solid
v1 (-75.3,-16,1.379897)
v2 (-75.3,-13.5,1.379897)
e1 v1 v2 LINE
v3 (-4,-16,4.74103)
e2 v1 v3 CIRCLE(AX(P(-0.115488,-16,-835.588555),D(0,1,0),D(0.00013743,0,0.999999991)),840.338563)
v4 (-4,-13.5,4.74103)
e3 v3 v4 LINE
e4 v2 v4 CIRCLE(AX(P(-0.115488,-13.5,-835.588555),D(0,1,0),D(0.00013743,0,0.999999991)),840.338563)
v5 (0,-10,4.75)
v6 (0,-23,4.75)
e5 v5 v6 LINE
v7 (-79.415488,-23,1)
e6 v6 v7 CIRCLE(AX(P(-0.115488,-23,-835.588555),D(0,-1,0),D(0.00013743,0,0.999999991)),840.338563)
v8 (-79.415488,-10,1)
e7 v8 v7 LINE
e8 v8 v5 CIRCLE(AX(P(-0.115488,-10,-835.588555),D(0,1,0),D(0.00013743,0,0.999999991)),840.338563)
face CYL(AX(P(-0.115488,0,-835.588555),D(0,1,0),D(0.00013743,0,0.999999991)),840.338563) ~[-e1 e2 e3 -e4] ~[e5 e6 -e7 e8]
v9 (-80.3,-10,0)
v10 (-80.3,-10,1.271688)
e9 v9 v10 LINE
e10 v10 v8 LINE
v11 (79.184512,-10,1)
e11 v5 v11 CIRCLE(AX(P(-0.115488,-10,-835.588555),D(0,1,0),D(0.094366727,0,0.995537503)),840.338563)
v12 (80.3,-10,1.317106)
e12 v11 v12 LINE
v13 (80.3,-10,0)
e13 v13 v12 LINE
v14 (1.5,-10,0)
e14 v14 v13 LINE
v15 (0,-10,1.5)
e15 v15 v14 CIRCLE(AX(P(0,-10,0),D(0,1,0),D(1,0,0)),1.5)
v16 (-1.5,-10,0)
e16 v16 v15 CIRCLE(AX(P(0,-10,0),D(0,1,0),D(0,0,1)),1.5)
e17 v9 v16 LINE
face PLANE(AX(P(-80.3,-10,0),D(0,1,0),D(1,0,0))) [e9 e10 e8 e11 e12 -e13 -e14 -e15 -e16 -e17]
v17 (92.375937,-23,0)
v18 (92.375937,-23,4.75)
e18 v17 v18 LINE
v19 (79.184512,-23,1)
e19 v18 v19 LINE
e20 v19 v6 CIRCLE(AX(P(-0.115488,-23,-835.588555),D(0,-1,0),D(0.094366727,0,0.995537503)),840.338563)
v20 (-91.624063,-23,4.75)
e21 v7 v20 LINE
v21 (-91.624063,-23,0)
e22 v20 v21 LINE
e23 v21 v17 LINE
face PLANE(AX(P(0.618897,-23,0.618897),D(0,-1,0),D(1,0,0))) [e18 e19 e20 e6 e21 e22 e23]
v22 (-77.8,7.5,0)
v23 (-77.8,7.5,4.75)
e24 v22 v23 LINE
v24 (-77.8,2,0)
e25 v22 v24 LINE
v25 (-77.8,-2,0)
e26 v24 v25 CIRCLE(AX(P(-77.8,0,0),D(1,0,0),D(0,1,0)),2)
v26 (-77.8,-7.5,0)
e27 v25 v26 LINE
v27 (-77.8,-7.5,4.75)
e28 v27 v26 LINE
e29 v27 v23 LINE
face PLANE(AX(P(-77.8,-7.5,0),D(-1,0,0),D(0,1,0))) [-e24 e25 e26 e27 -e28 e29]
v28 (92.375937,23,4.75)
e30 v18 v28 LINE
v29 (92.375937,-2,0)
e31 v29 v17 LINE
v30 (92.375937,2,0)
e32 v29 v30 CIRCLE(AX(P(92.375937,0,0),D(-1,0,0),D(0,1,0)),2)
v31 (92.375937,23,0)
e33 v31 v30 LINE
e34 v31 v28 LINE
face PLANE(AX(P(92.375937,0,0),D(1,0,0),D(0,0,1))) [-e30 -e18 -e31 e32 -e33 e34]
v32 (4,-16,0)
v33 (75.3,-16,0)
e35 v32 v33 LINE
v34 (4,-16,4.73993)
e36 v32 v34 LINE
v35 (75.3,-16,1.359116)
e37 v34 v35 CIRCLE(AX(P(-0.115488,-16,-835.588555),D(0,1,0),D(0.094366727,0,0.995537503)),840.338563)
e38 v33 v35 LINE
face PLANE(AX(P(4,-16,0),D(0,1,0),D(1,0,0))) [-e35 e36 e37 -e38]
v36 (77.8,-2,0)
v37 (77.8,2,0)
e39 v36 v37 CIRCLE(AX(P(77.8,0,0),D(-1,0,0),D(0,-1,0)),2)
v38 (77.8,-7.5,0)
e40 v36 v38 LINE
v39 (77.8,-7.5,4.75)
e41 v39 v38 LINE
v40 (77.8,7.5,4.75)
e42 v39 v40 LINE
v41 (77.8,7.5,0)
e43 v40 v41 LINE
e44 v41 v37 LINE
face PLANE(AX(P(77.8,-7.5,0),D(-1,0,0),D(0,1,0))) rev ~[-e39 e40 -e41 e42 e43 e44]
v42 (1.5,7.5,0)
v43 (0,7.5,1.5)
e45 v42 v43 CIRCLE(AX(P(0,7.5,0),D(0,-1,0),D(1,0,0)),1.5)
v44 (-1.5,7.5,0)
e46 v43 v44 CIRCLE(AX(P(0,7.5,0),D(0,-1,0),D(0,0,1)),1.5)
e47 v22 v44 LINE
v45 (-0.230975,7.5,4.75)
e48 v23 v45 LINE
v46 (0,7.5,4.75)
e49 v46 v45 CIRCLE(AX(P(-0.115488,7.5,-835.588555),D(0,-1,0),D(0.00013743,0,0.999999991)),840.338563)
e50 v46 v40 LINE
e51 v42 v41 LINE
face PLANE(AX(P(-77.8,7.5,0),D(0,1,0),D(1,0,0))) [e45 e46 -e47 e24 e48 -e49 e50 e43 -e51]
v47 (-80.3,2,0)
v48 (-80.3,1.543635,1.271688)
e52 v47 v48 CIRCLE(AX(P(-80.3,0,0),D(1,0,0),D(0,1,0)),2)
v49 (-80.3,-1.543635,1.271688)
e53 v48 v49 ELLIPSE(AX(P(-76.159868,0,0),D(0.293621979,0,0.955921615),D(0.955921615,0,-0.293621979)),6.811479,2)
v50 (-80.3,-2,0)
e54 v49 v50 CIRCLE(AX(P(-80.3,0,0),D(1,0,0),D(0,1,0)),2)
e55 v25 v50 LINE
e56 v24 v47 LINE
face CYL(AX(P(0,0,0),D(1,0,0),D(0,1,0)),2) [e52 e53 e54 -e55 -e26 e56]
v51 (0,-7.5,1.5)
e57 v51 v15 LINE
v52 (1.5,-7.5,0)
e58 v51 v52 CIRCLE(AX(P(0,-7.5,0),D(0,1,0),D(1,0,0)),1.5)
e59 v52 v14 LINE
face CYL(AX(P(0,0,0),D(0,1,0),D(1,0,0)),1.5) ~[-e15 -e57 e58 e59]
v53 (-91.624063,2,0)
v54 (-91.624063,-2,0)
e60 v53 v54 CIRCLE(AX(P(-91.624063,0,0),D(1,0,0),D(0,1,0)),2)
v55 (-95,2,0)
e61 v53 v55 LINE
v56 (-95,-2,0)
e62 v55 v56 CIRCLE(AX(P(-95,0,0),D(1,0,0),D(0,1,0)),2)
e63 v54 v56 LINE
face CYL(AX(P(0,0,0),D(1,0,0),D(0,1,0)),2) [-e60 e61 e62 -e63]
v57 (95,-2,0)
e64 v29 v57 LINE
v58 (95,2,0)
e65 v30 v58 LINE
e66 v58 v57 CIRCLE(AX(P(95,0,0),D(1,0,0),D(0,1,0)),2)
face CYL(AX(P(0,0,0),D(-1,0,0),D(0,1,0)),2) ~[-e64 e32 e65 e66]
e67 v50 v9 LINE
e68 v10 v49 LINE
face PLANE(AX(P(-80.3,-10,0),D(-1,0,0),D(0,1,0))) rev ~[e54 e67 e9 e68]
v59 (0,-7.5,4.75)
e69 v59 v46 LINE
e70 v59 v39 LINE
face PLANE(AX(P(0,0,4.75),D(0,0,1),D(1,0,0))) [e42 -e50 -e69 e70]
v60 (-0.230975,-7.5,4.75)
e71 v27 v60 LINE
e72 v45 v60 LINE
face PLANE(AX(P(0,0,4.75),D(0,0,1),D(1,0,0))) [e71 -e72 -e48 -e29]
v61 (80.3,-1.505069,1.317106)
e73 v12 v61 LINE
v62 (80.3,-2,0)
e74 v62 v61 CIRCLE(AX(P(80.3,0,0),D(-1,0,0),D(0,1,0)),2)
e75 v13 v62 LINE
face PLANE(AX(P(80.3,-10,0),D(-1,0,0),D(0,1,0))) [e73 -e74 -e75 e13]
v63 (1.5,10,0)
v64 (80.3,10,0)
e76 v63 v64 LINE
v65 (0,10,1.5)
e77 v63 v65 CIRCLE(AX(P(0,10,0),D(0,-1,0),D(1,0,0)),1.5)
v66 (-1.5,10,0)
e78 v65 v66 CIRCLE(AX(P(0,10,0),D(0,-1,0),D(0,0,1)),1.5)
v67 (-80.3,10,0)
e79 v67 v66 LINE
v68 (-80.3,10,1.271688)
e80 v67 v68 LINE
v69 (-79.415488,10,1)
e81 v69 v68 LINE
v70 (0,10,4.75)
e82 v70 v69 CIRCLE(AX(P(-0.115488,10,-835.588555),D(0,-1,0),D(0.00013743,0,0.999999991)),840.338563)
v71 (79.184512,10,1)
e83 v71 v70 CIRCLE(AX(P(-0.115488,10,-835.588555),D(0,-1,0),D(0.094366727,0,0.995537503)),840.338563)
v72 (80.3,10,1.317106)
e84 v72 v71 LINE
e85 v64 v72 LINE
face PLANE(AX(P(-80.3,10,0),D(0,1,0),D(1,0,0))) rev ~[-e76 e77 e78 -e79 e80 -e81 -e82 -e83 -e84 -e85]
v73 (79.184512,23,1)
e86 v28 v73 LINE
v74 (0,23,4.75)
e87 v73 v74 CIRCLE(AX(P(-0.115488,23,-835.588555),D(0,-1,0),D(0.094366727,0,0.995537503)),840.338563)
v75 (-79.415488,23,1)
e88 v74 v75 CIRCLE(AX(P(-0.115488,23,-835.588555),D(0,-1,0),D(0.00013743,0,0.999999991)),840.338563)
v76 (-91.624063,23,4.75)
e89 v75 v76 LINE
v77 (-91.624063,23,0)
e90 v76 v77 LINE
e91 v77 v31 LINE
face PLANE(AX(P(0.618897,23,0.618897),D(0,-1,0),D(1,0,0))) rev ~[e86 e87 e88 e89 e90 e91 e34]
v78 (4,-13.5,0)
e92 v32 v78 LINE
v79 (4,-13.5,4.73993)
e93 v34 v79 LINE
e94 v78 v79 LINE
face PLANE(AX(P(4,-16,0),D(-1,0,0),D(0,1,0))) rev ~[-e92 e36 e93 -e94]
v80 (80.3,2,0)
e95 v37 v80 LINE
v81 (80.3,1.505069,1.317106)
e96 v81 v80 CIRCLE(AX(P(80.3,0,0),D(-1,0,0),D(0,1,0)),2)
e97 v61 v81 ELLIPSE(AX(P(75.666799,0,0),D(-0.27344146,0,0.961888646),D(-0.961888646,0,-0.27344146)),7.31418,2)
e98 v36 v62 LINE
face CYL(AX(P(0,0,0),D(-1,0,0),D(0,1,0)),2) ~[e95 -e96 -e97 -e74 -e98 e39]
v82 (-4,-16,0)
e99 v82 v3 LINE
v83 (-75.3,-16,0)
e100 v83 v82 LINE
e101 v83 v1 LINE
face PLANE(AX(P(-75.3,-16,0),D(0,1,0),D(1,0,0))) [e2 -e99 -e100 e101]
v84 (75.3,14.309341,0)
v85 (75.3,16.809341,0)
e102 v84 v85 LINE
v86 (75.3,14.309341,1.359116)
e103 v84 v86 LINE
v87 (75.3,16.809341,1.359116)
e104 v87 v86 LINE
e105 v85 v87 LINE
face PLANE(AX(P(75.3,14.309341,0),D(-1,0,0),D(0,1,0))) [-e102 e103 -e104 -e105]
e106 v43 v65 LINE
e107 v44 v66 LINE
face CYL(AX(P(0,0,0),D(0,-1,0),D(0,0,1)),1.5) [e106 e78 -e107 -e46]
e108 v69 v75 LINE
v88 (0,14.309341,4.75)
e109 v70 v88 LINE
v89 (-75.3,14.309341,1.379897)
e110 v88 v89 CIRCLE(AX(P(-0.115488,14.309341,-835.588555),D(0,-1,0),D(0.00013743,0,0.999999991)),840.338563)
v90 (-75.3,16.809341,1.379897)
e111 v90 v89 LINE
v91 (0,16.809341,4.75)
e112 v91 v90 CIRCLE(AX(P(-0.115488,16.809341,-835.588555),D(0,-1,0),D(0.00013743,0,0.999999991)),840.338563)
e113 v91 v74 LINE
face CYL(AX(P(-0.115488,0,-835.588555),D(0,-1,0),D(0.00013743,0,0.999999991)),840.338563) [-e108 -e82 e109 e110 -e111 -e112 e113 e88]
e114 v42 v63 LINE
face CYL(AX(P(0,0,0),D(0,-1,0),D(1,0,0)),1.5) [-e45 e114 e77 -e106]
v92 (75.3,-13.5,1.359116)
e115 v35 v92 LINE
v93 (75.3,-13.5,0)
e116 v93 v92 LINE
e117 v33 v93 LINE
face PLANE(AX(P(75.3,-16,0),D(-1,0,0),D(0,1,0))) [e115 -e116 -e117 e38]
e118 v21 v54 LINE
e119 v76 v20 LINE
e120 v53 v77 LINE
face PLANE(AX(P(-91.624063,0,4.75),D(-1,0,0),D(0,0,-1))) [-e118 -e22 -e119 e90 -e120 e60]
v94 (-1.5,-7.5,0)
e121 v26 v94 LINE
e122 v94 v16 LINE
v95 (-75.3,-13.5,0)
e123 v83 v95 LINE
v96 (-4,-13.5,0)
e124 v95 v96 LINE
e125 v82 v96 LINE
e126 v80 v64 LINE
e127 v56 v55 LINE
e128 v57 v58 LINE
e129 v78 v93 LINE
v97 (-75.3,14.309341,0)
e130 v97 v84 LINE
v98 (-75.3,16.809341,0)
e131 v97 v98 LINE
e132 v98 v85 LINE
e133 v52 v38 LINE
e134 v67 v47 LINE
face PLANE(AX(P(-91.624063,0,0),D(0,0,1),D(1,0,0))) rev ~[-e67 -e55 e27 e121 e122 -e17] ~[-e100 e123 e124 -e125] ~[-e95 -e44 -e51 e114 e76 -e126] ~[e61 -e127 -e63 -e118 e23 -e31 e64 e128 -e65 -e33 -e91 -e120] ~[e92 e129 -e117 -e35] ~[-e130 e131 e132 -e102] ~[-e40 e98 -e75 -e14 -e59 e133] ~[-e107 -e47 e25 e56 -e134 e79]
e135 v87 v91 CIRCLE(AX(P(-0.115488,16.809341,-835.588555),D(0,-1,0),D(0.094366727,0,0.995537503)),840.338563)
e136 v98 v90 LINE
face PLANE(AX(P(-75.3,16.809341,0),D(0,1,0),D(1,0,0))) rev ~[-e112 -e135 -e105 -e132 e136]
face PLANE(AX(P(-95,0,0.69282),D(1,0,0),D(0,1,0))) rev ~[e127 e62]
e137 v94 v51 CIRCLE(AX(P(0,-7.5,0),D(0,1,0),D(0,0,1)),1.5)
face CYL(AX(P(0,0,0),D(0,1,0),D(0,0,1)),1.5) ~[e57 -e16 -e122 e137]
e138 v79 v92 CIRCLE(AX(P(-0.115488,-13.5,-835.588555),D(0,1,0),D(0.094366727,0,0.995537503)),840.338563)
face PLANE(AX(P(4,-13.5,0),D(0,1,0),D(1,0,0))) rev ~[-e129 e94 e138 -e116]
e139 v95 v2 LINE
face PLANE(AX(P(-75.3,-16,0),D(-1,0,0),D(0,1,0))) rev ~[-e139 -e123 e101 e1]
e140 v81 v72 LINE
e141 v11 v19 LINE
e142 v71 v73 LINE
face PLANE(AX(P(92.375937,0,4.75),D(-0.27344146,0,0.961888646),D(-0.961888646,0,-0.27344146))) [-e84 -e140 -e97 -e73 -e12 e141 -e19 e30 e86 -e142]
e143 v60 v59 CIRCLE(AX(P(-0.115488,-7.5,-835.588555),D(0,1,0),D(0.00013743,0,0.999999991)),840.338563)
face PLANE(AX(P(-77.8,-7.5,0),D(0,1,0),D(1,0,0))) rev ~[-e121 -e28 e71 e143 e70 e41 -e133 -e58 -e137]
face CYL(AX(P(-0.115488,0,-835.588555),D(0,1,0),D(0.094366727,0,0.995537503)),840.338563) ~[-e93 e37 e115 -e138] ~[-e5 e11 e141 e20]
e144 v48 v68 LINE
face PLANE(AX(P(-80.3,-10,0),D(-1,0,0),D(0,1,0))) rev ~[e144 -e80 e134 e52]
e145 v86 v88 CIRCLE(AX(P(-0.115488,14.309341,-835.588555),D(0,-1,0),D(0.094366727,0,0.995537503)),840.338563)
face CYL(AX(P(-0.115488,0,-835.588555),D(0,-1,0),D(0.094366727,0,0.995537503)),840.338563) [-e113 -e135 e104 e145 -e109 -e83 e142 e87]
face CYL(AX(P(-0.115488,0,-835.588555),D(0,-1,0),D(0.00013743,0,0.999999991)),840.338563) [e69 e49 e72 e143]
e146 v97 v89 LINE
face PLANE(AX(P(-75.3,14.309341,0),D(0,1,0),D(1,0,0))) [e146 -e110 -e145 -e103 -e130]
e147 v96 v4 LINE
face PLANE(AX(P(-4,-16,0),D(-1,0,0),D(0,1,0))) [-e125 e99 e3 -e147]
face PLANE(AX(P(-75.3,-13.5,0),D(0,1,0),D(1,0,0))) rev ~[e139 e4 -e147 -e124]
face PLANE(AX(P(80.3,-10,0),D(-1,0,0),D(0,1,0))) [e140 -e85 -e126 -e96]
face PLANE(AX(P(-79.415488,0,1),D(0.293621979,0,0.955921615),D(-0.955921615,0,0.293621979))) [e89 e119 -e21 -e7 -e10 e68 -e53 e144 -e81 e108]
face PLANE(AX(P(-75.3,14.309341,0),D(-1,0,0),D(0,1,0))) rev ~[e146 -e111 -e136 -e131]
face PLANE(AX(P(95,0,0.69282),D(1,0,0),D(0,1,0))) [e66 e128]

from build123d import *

# Parameters (mm, degrees)
F3_DEPTH      = 23
F3_DEPTH_BACK = 23
F2_W          = 71.3
F2_H          = 2.5
F2_W_2        = 160.6
F2_H_2        = 20
F2_W_3        = 155.6
F2_H_3        = 15
F2_W_4        = 150.6
F4_DEPTH      = 5
F7_DEPTH      = 95
F7_DEPTH_BACK = 95
F8_DEPTH      = 12
F8_DEPTH_BACK = 12
F9_DEPTH      = 4.75


# Not quite as in the source:
# - a feature names something its author has since deleted; it is built from what else it names


with BuildPart() as f3:
    # F0 (on Front) → F3 (new body, two sides)
    with BuildSketch(Plane.XZ) as f3_sk:
        with BuildLine():
            Line((0, 1.5), (0, 0))
            Line((0, 0), (1.5, 0))
            ThreePointArc((1.5, 0), (1.0606601718, 1.0606601718), (0, 1.5))
        make_face()
        with BuildLine():
            ThreePointArc((0, 1.5), (-1.0606601718, 1.0606601718), (-1.5, 0))
            Line((-1.5, 0), (0, 0))
            Line((0, 0), (0, 1.5))
        make_face()
        with BuildLine():
            Line((-91.6240630262, 0), (-79.4154876804, 0))
            Line((-79.4154876804, 0), (-1.5, 0))
            ThreePointArc((-1.5, 0), (-1.0606601718, 1.0606601718), (0, 1.5))
            Line((0, 1.5), (0, 4.75))
            ThreePointArc((0, 4.75), (-39.7521168613, 3.8147080292), (-79.4154876804, 1))
            Line((-79.4154876804, 1), (-91.6240630262, 4.75))
            Line((-91.6240630262, 4.75), (-91.6240630262, 0))
        make_face()
        with BuildLine():
            Line((0, 4.75), (0, 1.5))
            ThreePointArc((0, 1.5), (1.0606601718, 1.0606601718), (1.5, 0))
            Line((1.5, 0), (79.1845123196, 0))
            Line((79.1845123196, 0), (92.3759369738, 0))
            Line((92.3759369738, 0), (92.3759369738, 4.75))
            Line((92.3759369738, 4.75), (79.1845123196, 1))
            ThreePointArc((79.1845123196, 1), (39.6365002683, 3.8092528426), (0, 4.75))
        make_face()
    extrude(amount=F3_DEPTH)
    extrude(f3_sk.sketch, amount=-F3_DEPTH_BACK)

    # F2 (on Top) → F4 (cut)
    with BuildSketch(Plane.XY):
        with Locations((-39.65, -14.75)):
            Rectangle(F2_W, F2_H)
        with Locations((39.65, -14.75)):
            Rectangle(F2_W, F2_H)
        Rectangle(F2_W_2, F2_H_2)
        Rectangle(F2_W_3, F2_H_3, mode=Mode.SUBTRACT)
        with Locations((0, 15.5593407378)):
            Rectangle(F2_W_4, F2_H)
    extrude(amount=F4_DEPTH, mode=Mode.SUBTRACT)

    # F6 (on Right) → F7 (join, two sides)
    with BuildSketch(Plane.YZ) as f7_sk:
        with BuildLine():
            Line((-2, 0), (2, 0))
            ThreePointArc((2, 0), (0, 2), (-2, 0))
        make_face()
    extrude(amount=F7_DEPTH)
    extrude(f7_sk.sketch, amount=-F7_DEPTH_BACK)

    # F0 (on Front) → F8 (join, two sides)
    with BuildSketch(Plane.XZ) as f8_sk:
        with BuildLine():
            Line((0, 1.5), (0, 0))
            Line((0, 0), (1.5, 0))
            ThreePointArc((1.5, 0), (1.0606601718, 1.0606601718), (0, 1.5))
        make_face()
        with BuildLine():
            ThreePointArc((0, 1.5), (-1.0606601718, 1.0606601718), (-1.5, 0))
            Line((-1.5, 0), (0, 0))
            Line((0, 0), (0, 1.5))
        make_face()
    extrude(amount=F8_DEPTH)
    extrude(f8_sk.sketch, amount=-F8_DEPTH_BACK)

    # F2 (on Top) → F9 (join)
    with BuildSketch(Plane.XY):
        Rectangle(F2_W_3, F2_H_3)
    extrude(amount=F9_DEPTH)


solid = f3.part
